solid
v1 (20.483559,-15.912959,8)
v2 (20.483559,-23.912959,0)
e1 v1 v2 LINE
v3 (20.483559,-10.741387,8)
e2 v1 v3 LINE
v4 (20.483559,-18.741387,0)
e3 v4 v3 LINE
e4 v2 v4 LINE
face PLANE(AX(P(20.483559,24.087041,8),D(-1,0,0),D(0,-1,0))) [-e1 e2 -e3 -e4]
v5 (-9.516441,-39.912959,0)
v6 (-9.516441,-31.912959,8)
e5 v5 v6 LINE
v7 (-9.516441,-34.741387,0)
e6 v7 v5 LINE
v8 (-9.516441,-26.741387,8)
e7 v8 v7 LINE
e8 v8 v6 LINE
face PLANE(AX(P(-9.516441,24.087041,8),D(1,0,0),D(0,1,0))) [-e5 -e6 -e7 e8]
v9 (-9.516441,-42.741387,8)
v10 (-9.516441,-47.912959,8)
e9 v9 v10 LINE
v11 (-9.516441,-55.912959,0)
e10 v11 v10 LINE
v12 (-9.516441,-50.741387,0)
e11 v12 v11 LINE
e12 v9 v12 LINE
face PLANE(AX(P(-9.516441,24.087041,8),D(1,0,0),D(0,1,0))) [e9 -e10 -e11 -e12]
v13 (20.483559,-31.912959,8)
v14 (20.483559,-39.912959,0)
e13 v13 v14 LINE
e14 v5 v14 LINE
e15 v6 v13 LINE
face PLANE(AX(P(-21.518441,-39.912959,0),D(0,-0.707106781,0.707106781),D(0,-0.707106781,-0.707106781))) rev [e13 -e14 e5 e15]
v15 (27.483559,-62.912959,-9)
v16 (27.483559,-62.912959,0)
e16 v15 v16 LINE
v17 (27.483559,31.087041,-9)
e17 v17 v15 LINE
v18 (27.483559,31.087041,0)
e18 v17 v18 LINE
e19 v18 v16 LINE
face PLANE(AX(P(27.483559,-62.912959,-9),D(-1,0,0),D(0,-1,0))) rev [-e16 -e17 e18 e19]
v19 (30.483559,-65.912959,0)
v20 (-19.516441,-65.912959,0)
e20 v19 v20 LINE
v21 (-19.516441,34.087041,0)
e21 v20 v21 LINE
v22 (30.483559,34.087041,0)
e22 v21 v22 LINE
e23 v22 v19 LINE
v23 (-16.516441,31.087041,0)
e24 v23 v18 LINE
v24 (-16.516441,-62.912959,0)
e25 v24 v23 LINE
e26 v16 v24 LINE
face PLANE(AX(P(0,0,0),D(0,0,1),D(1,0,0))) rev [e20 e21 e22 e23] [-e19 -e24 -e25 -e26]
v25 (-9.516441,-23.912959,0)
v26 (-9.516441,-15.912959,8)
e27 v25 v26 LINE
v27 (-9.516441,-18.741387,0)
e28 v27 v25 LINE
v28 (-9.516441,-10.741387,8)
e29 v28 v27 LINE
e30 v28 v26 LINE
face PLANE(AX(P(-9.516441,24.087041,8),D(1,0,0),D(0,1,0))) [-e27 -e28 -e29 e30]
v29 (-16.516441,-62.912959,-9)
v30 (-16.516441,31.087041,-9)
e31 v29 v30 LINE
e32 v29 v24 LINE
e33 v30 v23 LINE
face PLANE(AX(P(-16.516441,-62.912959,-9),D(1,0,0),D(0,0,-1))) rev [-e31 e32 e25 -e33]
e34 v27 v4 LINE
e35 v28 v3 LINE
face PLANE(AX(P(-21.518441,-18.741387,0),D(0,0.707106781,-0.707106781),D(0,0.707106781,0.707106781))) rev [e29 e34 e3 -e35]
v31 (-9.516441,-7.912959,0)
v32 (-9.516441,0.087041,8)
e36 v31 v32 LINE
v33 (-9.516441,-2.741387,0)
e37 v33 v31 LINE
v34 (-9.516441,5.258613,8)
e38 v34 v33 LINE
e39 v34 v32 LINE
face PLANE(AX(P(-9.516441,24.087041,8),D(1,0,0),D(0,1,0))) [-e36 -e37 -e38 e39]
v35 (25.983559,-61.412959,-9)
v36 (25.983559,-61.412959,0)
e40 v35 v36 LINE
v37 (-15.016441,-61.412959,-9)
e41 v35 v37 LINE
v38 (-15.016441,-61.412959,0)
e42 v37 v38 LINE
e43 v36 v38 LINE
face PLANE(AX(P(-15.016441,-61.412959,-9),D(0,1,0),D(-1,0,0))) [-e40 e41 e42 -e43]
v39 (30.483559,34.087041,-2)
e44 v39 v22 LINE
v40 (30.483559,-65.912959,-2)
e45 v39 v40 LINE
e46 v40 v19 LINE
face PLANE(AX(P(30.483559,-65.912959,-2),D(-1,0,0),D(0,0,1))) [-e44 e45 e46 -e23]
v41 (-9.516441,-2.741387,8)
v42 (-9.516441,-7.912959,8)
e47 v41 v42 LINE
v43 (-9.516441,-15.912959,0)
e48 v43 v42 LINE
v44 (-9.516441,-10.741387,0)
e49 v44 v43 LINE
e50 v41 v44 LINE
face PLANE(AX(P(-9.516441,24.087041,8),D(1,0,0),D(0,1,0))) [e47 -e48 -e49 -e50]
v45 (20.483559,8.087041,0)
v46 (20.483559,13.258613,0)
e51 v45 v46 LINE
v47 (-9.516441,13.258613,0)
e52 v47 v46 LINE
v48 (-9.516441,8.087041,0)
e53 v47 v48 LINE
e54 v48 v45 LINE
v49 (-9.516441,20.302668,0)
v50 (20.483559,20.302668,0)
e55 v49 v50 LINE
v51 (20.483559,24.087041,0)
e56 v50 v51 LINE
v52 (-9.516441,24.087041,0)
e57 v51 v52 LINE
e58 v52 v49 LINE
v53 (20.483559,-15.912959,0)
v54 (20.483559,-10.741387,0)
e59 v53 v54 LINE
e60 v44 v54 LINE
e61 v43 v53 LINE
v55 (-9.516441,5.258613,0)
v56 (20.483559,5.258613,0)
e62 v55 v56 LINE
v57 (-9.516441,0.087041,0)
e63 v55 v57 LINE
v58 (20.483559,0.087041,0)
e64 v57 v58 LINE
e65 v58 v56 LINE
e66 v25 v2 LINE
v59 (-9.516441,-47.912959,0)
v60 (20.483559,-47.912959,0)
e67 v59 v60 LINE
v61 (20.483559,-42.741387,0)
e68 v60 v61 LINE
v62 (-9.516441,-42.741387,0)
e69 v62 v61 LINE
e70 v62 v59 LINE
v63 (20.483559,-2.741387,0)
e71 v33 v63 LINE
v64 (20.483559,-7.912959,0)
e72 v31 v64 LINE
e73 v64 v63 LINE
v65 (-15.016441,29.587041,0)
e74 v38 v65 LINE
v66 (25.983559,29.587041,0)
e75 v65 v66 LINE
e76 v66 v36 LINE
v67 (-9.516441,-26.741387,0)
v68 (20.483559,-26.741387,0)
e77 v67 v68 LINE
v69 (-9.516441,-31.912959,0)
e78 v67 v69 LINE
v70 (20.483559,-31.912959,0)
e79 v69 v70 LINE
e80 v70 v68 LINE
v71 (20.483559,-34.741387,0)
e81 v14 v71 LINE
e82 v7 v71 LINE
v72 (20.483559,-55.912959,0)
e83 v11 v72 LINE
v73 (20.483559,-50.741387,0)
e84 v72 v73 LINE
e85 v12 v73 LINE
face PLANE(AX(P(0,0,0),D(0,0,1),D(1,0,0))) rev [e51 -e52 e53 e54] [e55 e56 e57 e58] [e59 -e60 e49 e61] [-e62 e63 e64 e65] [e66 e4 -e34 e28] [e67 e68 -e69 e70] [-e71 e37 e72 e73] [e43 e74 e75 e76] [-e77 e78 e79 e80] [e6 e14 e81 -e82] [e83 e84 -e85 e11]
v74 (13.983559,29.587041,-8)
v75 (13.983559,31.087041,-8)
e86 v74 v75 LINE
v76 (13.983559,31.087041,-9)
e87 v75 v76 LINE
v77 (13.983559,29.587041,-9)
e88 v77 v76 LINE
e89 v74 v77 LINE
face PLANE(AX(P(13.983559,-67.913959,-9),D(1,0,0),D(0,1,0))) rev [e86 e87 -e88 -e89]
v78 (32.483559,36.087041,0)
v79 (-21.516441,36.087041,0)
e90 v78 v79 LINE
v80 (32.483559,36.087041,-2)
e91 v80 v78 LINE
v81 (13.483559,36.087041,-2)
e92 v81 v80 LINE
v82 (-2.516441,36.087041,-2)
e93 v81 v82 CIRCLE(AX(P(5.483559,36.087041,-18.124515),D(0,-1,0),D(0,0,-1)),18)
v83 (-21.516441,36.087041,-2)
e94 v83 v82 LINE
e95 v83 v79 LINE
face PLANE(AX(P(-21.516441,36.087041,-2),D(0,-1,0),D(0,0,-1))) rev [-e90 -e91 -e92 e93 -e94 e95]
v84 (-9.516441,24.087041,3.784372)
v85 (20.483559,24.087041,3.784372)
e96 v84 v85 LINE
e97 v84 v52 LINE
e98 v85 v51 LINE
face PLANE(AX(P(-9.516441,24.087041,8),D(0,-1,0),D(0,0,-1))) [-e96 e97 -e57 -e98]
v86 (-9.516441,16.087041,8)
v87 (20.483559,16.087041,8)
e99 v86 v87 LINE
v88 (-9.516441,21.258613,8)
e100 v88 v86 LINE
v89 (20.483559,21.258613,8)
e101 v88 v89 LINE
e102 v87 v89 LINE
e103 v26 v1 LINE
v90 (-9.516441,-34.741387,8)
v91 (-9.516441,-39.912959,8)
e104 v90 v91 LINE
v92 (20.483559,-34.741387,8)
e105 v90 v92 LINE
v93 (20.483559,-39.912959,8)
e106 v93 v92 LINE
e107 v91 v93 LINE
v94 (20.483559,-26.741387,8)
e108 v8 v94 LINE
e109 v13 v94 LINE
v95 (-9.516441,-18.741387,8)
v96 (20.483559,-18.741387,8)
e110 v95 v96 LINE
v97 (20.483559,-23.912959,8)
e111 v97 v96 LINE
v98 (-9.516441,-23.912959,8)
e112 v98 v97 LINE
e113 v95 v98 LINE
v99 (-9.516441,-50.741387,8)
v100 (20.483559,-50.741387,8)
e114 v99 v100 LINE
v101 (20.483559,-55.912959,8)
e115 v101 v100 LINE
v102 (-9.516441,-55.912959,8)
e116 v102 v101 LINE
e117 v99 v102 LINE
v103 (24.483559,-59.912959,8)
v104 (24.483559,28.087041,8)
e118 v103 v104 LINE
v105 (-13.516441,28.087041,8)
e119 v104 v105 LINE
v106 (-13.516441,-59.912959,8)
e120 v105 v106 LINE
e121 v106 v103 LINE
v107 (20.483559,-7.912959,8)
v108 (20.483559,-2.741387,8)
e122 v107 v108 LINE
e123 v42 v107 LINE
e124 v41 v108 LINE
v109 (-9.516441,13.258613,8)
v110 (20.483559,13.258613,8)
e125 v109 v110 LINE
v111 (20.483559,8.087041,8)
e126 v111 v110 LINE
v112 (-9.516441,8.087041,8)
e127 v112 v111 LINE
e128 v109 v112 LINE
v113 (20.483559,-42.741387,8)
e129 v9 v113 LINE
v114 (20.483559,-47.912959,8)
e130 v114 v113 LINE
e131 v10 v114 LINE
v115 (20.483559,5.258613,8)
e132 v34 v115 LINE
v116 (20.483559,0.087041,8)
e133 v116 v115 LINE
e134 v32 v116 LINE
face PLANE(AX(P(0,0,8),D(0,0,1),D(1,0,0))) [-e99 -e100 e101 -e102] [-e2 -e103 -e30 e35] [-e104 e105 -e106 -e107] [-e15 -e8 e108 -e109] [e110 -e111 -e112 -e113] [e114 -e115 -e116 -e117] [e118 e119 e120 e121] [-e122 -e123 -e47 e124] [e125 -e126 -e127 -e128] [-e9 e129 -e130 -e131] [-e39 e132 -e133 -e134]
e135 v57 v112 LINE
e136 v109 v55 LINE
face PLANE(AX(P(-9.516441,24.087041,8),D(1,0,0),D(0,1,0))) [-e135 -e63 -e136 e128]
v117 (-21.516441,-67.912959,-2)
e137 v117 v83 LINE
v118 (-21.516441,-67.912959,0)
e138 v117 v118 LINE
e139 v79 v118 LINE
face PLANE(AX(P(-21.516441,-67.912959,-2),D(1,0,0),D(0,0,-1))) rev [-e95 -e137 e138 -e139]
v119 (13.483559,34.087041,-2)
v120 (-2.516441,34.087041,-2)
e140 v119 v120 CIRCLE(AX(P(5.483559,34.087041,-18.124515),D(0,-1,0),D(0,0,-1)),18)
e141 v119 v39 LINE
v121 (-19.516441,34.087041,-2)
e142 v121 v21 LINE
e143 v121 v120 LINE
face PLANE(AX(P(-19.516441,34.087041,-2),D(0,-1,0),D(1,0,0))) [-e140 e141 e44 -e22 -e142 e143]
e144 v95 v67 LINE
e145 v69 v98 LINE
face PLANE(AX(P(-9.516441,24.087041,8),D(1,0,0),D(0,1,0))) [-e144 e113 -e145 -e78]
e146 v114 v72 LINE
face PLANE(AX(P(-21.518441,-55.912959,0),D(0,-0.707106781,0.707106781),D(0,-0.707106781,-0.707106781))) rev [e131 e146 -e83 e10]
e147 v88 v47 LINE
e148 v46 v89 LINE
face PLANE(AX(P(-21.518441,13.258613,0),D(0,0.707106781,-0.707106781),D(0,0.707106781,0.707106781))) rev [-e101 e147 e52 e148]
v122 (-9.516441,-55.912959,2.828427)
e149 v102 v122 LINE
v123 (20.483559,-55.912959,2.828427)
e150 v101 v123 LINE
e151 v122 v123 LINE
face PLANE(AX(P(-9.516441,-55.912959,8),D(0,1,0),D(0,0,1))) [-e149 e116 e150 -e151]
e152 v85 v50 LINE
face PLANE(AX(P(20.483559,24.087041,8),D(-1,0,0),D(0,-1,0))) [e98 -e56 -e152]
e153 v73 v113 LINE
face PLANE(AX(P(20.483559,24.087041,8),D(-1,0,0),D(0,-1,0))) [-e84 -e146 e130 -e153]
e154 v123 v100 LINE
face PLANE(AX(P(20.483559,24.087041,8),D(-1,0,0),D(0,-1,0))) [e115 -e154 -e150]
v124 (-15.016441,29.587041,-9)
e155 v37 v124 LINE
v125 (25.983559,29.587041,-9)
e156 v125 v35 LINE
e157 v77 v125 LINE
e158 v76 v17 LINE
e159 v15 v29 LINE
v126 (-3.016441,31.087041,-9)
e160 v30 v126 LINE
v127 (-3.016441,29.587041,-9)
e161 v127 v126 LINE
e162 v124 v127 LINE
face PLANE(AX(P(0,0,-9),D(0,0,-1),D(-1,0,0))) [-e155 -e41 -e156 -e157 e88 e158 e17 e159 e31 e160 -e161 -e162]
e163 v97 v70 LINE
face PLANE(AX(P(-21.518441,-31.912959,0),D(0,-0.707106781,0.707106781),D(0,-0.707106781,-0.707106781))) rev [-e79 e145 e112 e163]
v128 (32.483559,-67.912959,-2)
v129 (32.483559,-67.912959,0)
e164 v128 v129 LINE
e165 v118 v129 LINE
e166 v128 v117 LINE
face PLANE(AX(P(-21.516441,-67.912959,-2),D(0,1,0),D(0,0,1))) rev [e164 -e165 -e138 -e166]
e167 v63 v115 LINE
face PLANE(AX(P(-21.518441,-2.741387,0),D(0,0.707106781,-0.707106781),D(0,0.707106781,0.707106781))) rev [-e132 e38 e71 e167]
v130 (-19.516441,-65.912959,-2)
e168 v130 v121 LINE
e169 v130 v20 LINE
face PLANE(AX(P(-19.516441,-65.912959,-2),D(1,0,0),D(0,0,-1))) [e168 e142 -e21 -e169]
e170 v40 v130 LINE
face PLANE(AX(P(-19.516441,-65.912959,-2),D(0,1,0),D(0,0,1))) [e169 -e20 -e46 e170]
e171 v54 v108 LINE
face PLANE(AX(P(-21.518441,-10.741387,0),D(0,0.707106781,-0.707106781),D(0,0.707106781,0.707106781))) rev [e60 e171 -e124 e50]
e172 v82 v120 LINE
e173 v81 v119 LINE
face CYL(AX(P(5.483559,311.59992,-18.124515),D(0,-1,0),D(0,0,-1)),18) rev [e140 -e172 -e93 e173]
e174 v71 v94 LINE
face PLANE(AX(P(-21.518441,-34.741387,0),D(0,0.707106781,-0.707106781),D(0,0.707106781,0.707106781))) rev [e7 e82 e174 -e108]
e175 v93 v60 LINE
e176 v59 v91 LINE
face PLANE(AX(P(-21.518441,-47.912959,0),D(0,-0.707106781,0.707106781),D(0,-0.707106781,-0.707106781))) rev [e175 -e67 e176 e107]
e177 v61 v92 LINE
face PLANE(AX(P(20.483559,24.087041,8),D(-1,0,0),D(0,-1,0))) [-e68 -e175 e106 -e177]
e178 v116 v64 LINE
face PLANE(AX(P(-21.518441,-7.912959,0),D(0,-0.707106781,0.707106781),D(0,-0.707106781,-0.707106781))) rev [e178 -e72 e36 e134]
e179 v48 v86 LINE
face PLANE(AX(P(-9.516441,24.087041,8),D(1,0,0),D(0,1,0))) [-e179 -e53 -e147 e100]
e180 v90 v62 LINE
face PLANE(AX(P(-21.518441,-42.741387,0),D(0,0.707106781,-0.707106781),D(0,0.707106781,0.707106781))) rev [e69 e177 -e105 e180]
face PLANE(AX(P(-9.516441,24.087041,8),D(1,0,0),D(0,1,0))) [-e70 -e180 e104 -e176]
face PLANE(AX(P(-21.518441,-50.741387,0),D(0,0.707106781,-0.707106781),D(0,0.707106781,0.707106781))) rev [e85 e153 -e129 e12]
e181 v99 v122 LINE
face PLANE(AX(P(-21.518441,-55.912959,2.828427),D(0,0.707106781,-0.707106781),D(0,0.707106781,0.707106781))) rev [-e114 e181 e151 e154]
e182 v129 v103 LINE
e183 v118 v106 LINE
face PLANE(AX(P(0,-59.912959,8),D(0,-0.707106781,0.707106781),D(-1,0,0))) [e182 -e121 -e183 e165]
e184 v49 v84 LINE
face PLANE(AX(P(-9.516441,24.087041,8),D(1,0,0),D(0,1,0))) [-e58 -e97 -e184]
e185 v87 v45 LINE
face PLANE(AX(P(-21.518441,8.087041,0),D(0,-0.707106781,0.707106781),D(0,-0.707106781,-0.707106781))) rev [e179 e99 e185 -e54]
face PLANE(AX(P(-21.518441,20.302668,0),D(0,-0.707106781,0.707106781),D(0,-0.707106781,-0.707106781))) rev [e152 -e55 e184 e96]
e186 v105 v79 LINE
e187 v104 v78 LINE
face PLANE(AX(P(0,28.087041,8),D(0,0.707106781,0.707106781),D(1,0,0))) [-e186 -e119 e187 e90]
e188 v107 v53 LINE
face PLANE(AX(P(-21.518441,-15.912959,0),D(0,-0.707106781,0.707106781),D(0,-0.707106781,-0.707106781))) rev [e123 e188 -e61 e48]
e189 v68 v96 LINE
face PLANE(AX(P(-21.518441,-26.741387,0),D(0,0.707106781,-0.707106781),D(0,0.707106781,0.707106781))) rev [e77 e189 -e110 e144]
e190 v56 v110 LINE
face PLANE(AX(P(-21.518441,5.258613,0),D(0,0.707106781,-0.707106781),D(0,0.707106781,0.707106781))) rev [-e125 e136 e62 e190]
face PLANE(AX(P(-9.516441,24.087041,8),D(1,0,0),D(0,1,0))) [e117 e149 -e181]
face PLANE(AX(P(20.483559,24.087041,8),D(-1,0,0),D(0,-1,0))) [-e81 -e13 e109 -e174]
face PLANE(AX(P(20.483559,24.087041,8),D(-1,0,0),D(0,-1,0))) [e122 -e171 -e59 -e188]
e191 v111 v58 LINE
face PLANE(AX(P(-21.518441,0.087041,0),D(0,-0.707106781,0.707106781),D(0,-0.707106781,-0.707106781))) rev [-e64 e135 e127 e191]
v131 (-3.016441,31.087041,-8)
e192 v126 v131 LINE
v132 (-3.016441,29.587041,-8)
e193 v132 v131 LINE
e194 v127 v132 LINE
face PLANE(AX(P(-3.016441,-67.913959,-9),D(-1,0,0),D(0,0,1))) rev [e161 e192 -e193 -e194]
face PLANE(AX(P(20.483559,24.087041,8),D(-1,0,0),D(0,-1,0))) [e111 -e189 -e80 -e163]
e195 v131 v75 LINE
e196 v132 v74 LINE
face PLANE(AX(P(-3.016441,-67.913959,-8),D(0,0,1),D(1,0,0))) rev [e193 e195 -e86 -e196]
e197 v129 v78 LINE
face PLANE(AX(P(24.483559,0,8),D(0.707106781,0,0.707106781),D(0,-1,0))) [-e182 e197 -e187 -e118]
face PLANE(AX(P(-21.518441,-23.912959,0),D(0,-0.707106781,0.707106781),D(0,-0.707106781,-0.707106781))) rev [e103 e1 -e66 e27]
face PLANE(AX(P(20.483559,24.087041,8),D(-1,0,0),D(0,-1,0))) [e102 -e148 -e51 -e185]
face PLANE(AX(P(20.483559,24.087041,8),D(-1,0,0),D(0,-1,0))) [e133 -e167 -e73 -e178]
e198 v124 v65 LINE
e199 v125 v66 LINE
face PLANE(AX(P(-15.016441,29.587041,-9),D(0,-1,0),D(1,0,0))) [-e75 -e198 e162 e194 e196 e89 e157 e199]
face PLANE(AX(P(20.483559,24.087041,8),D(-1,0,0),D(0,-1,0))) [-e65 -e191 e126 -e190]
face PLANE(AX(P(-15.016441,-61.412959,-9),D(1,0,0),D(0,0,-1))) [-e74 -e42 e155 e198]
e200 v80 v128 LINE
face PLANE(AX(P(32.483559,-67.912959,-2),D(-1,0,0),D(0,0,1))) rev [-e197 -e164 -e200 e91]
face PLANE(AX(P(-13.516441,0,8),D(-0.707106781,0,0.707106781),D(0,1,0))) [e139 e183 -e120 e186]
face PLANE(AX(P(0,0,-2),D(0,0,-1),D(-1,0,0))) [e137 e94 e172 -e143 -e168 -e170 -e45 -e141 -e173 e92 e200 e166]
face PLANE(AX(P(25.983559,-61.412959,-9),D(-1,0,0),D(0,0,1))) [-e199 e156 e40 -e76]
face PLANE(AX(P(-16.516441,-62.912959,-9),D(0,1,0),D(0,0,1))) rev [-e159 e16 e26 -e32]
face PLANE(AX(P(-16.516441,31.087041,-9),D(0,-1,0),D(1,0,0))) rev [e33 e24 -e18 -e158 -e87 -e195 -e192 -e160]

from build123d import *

# Parameters (mm, degrees)
SKETCH1_W               = 54
SKETCH1_H               = 104
SKETCH1_W_2             = 30
SKETCH1_H_2             = 80
BOSS_EXTRUDE1_DEPTH     = 8
CHAMFER1_SIZE           = 8
SKETCH2_W               = 54
SKETCH2_H               = 104
SKETCH2_W_2             = 50
SKETCH2_H_2             = 100
BOSS_EXTRUDE2_DEPTH     = 2
SKETCH3_W               = 44
SKETCH3_H               = 94
SKETCH3_W_2             = 41
SKETCH3_H_2             = 91
BOSS_EXTRUDE3_DEPTH     = 9
CUT_EXTRUDE1_REACH      = 106.581
SKETCH4_W               = 17
SKETCH4_H               = 1
CUT_EXTRUDE2_DEPTH      = 110.326033519
CUT_EXTRUDE2_DEPTH_BACK = 2
BOSS_EXTRUDE4_REACH     = 82.357


with BuildPart() as part:
    # Sketch1 → Boss-Extrude1 (new body)
    with BuildSketch(Plane.XY):
        with Locations((5.483558994, -15.912959381)):
            Rectangle(SKETCH1_W, SKETCH1_H)
        with Locations((5.483558994, -15.912959381)):
            Rectangle(SKETCH1_W_2, SKETCH1_H_2, mode=Mode.SUBTRACT)
    extrude(amount=BOSS_EXTRUDE1_DEPTH)

    # Chamfer1
    chamfer1_edges = [part.edges().sort_by_distance(p)[0] for p in [
        (-21.516441006, -15.912959381, 8),
        (5.483558994, 36.087040619, 8),
        (32.483558994, -15.912959381, 8),
        (5.483558994, -67.912959381, 8),
    ]]
    chamfer(chamfer1_edges, length=CHAMFER1_SIZE - 0.0001)  # a hair under: the kernel refuses the full size

    # Sketch2 → Boss-Extrude2 (add)
    with BuildSketch(Plane(origin=(0, 0, 0), x_dir=(-1, 0, 0), z_dir=(0, 0, -1))):
        with Locations((-5.483558994, -15.912959381)):
            Rectangle(SKETCH2_W, SKETCH2_H)
        with Locations((-5.483558994, -15.912959381)):
            Rectangle(SKETCH2_W_2, SKETCH2_H_2, mode=Mode.SUBTRACT)
    extrude(amount=BOSS_EXTRUDE2_DEPTH)

    # Sketch3 → Boss-Extrude3 (add)
    with BuildSketch(Plane(origin=(0, 0, 0), x_dir=(-1, 0, 0), z_dir=(0, 0, -1))):
        with Locations((-5.483558994, -15.912959381)):
            Rectangle(SKETCH3_W, SKETCH3_H)
        with Locations((-5.483558994, -15.912959381)):
            Rectangle(SKETCH3_W_2, SKETCH3_H_2, mode=Mode.SUBTRACT)
    extrude(amount=BOSS_EXTRUDE3_DEPTH)

    # Sketch4 → Cut-Extrude1 (cut, up to next)
    with BuildSketch(Plane(origin=(0, 31.087040619, 0), x_dir=(1, 0, 0), z_dir=(0, 1, 0)), mode=Mode.PRIVATE) as cut_extrude1_sk1:
        with Locations((5.483558994, 8.5)):
            Rectangle(SKETCH4_W, SKETCH4_H)
    cut_extrude1_tool1 = extrude(cut_extrude1_sk1.sketch, amount=-CUT_EXTRUDE1_REACH, mode=Mode.PRIVATE) & part.part
    add(cut_extrude1_tool1.solids().sort_by_distance((5.483559, 31.087041, -8.5))[0], mode=Mode.SUBTRACT)

    # Sketch5 → Cut-Extrude2 (cut, two sides: drawn at the far end of the back side and taken through both)
    with BuildSketch(Plane(origin=(0, 36.087040619, 0), x_dir=(1, 0, 0), z_dir=(0, 1, 0)).offset(-CUT_EXTRUDE2_DEPTH_BACK)):
        with BuildLine():
            Line((-76.690196685, 38.800488397), (-2.516441006, 2))
            ThreePointArc((-2.516441006, 2), (5.483558994, 0.124515497), (13.483558994, 2))
            Line((13.483558994, 2), (87.657314674, 38.800488397))
            Line((87.657314674, 38.800488397), (87.657314674, 204.402686182))
            Line((87.657314674, 204.402686182), (-76.690196685, 204.402686182))
            Line((-76.690196685, 204.402686182), (-76.690196685, 38.800488397))
        make_face()
    extrude(amount=CUT_EXTRUDE2_DEPTH + CUT_EXTRUDE2_DEPTH_BACK, mode=Mode.SUBTRACT)

    # Sketch6 → Boss-Extrude4 (add, up to next)
    with BuildSketch(Plane.ZY.offset(-20.483558994), mode=Mode.PRIVATE) as boss_extrude4_sk1:
        Polygon((0, -55.912959381), (8, -47.912959381), (8, -50.741386506), (2.828427125, -55.912959381), align=None)
    boss_extrude4_tool1 = extrude(boss_extrude4_sk1.sketch, amount=BOSS_EXTRUDE4_REACH, mode=Mode.PRIVATE) - part.part
    # Sketch6 → Boss-Extrude4 (add, up to next)
    with BuildSketch(Plane.ZY.offset(-20.483558994), mode=Mode.PRIVATE) as boss_extrude4_sk2:
        Polygon((0, -50.741386506), (8, -42.741386506), (8, -39.912959381), (0, -47.912959381), align=None)
    boss_extrude4_tool2 = extrude(boss_extrude4_sk2.sketch, amount=BOSS_EXTRUDE4_REACH, mode=Mode.PRIVATE) - part.part
    # Sketch6 → Boss-Extrude4 (add, up to next)
    with BuildSketch(Plane.ZY.offset(-20.483558994), mode=Mode.PRIVATE) as boss_extrude4_sk3:
        Polygon((0, -42.741386506), (0, -39.912959381), (8, -31.912959381), (8, -34.741386506), align=None)
    boss_extrude4_tool3 = extrude(boss_extrude4_sk3.sketch, amount=BOSS_EXTRUDE4_REACH, mode=Mode.PRIVATE) - part.part
    # Sketch6 → Boss-Extrude4 (add, up to next)
    with BuildSketch(Plane.ZY.offset(-20.483558994), mode=Mode.PRIVATE) as boss_extrude4_sk4:
        Polygon((0, -34.741386506), (0, -31.912959381), (8, -23.912959381), (8, -26.741386506), align=None)
    boss_extrude4_tool4 = extrude(boss_extrude4_sk4.sketch, amount=BOSS_EXTRUDE4_REACH, mode=Mode.PRIVATE) - part.part
    # Sketch6 → Boss-Extrude4 (add, up to next)
    with BuildSketch(Plane.ZY.offset(-20.483558994), mode=Mode.PRIVATE) as boss_extrude4_sk5:
        Polygon((0, -26.741386506), (0, -23.912959381), (8, -15.912959381), (8, -18.741386506), align=None)
    boss_extrude4_tool5 = extrude(boss_extrude4_sk5.sketch, amount=BOSS_EXTRUDE4_REACH, mode=Mode.PRIVATE) - part.part
    # Sketch6 → Boss-Extrude4 (add, up to next)
    with BuildSketch(Plane.ZY.offset(-20.483558994), mode=Mode.PRIVATE) as boss_extrude4_sk6:
        Polygon((0, -18.741386506), (0, -15.912959381), (8, -7.912959381), (8, -10.741386506), align=None)
    boss_extrude4_tool6 = extrude(boss_extrude4_sk6.sketch, amount=BOSS_EXTRUDE4_REACH, mode=Mode.PRIVATE) - part.part
    # Sketch6 → Boss-Extrude4 (add, up to next)
    with BuildSketch(Plane.ZY.offset(-20.483558994), mode=Mode.PRIVATE) as boss_extrude4_sk7:
        Polygon((0, -10.741386506), (0, -7.912959381), (8, 0.087040619), (8, -2.741386506), align=None)
    boss_extrude4_tool7 = extrude(boss_extrude4_sk7.sketch, amount=BOSS_EXTRUDE4_REACH, mode=Mode.PRIVATE) - part.part
    # Sketch6 → Boss-Extrude4 (add, up to next)
    with BuildSketch(Plane.ZY.offset(-20.483558994), mode=Mode.PRIVATE) as boss_extrude4_sk8:
        Polygon((0, -2.741386506), (0, 0.087040619), (8, 8.087040619), (8, 5.258613494), align=None)
    boss_extrude4_tool8 = extrude(boss_extrude4_sk8.sketch, amount=BOSS_EXTRUDE4_REACH, mode=Mode.PRIVATE) - part.part
    # Sketch6 → Boss-Extrude4 (add, up to next)
    with BuildSketch(Plane.ZY.offset(-20.483558994), mode=Mode.PRIVATE) as boss_extrude4_sk9:
        Polygon((0, 5.258613494), (0, 8.087040619), (8, 16.087040619), (8, 13.258613494), align=None)
    boss_extrude4_tool9 = extrude(boss_extrude4_sk9.sketch, amount=BOSS_EXTRUDE4_REACH, mode=Mode.PRIVATE) - part.part
    # Sketch6 → Boss-Extrude4 (add, up to next)
    with BuildSketch(Plane.ZY.offset(-20.483558994), mode=Mode.PRIVATE) as boss_extrude4_sk10:
        Polygon((8, 24.087040619), (8, 21.258613494), (0, 13.258613494), (0, 20.302668178), (3.784372441, 24.087040619), align=None)
    boss_extrude4_tool10 = extrude(boss_extrude4_sk10.sketch, amount=BOSS_EXTRUDE4_REACH, mode=Mode.PRIVATE) - part.part
    add(boss_extrude4_tool1.solids().sort_by_distance((20.483559, -52.569452, 4.656493))[0])
    add(boss_extrude4_tool2.solids().sort_by_distance((20.483559, -45.327173, 4))[0])
    add(boss_extrude4_tool3.solids().sort_by_distance((20.483559, -37.327173, 4))[0])
    add(boss_extrude4_tool4.solids().sort_by_distance((20.483559, -29.327173, 4))[0])
    add(boss_extrude4_tool5.solids().sort_by_distance((20.483559, -21.327173, 4))[0])
    add(boss_extrude4_tool6.solids().sort_by_distance((20.483559, -13.327173, 4))[0])
    add(boss_extrude4_tool7.solids().sort_by_distance((20.483559, -5.327173, 4))[0])
    add(boss_extrude4_tool8.solids().sort_by_distance((20.483559, 2.672827, 4))[0])
    add(boss_extrude4_tool9.solids().sort_by_distance((20.483559, 10.672827, 4))[0])
    add(boss_extrude4_tool10.solids().sort_by_distance((20.483559, 19.898628, 3.514255))[0])


solid = part.part
